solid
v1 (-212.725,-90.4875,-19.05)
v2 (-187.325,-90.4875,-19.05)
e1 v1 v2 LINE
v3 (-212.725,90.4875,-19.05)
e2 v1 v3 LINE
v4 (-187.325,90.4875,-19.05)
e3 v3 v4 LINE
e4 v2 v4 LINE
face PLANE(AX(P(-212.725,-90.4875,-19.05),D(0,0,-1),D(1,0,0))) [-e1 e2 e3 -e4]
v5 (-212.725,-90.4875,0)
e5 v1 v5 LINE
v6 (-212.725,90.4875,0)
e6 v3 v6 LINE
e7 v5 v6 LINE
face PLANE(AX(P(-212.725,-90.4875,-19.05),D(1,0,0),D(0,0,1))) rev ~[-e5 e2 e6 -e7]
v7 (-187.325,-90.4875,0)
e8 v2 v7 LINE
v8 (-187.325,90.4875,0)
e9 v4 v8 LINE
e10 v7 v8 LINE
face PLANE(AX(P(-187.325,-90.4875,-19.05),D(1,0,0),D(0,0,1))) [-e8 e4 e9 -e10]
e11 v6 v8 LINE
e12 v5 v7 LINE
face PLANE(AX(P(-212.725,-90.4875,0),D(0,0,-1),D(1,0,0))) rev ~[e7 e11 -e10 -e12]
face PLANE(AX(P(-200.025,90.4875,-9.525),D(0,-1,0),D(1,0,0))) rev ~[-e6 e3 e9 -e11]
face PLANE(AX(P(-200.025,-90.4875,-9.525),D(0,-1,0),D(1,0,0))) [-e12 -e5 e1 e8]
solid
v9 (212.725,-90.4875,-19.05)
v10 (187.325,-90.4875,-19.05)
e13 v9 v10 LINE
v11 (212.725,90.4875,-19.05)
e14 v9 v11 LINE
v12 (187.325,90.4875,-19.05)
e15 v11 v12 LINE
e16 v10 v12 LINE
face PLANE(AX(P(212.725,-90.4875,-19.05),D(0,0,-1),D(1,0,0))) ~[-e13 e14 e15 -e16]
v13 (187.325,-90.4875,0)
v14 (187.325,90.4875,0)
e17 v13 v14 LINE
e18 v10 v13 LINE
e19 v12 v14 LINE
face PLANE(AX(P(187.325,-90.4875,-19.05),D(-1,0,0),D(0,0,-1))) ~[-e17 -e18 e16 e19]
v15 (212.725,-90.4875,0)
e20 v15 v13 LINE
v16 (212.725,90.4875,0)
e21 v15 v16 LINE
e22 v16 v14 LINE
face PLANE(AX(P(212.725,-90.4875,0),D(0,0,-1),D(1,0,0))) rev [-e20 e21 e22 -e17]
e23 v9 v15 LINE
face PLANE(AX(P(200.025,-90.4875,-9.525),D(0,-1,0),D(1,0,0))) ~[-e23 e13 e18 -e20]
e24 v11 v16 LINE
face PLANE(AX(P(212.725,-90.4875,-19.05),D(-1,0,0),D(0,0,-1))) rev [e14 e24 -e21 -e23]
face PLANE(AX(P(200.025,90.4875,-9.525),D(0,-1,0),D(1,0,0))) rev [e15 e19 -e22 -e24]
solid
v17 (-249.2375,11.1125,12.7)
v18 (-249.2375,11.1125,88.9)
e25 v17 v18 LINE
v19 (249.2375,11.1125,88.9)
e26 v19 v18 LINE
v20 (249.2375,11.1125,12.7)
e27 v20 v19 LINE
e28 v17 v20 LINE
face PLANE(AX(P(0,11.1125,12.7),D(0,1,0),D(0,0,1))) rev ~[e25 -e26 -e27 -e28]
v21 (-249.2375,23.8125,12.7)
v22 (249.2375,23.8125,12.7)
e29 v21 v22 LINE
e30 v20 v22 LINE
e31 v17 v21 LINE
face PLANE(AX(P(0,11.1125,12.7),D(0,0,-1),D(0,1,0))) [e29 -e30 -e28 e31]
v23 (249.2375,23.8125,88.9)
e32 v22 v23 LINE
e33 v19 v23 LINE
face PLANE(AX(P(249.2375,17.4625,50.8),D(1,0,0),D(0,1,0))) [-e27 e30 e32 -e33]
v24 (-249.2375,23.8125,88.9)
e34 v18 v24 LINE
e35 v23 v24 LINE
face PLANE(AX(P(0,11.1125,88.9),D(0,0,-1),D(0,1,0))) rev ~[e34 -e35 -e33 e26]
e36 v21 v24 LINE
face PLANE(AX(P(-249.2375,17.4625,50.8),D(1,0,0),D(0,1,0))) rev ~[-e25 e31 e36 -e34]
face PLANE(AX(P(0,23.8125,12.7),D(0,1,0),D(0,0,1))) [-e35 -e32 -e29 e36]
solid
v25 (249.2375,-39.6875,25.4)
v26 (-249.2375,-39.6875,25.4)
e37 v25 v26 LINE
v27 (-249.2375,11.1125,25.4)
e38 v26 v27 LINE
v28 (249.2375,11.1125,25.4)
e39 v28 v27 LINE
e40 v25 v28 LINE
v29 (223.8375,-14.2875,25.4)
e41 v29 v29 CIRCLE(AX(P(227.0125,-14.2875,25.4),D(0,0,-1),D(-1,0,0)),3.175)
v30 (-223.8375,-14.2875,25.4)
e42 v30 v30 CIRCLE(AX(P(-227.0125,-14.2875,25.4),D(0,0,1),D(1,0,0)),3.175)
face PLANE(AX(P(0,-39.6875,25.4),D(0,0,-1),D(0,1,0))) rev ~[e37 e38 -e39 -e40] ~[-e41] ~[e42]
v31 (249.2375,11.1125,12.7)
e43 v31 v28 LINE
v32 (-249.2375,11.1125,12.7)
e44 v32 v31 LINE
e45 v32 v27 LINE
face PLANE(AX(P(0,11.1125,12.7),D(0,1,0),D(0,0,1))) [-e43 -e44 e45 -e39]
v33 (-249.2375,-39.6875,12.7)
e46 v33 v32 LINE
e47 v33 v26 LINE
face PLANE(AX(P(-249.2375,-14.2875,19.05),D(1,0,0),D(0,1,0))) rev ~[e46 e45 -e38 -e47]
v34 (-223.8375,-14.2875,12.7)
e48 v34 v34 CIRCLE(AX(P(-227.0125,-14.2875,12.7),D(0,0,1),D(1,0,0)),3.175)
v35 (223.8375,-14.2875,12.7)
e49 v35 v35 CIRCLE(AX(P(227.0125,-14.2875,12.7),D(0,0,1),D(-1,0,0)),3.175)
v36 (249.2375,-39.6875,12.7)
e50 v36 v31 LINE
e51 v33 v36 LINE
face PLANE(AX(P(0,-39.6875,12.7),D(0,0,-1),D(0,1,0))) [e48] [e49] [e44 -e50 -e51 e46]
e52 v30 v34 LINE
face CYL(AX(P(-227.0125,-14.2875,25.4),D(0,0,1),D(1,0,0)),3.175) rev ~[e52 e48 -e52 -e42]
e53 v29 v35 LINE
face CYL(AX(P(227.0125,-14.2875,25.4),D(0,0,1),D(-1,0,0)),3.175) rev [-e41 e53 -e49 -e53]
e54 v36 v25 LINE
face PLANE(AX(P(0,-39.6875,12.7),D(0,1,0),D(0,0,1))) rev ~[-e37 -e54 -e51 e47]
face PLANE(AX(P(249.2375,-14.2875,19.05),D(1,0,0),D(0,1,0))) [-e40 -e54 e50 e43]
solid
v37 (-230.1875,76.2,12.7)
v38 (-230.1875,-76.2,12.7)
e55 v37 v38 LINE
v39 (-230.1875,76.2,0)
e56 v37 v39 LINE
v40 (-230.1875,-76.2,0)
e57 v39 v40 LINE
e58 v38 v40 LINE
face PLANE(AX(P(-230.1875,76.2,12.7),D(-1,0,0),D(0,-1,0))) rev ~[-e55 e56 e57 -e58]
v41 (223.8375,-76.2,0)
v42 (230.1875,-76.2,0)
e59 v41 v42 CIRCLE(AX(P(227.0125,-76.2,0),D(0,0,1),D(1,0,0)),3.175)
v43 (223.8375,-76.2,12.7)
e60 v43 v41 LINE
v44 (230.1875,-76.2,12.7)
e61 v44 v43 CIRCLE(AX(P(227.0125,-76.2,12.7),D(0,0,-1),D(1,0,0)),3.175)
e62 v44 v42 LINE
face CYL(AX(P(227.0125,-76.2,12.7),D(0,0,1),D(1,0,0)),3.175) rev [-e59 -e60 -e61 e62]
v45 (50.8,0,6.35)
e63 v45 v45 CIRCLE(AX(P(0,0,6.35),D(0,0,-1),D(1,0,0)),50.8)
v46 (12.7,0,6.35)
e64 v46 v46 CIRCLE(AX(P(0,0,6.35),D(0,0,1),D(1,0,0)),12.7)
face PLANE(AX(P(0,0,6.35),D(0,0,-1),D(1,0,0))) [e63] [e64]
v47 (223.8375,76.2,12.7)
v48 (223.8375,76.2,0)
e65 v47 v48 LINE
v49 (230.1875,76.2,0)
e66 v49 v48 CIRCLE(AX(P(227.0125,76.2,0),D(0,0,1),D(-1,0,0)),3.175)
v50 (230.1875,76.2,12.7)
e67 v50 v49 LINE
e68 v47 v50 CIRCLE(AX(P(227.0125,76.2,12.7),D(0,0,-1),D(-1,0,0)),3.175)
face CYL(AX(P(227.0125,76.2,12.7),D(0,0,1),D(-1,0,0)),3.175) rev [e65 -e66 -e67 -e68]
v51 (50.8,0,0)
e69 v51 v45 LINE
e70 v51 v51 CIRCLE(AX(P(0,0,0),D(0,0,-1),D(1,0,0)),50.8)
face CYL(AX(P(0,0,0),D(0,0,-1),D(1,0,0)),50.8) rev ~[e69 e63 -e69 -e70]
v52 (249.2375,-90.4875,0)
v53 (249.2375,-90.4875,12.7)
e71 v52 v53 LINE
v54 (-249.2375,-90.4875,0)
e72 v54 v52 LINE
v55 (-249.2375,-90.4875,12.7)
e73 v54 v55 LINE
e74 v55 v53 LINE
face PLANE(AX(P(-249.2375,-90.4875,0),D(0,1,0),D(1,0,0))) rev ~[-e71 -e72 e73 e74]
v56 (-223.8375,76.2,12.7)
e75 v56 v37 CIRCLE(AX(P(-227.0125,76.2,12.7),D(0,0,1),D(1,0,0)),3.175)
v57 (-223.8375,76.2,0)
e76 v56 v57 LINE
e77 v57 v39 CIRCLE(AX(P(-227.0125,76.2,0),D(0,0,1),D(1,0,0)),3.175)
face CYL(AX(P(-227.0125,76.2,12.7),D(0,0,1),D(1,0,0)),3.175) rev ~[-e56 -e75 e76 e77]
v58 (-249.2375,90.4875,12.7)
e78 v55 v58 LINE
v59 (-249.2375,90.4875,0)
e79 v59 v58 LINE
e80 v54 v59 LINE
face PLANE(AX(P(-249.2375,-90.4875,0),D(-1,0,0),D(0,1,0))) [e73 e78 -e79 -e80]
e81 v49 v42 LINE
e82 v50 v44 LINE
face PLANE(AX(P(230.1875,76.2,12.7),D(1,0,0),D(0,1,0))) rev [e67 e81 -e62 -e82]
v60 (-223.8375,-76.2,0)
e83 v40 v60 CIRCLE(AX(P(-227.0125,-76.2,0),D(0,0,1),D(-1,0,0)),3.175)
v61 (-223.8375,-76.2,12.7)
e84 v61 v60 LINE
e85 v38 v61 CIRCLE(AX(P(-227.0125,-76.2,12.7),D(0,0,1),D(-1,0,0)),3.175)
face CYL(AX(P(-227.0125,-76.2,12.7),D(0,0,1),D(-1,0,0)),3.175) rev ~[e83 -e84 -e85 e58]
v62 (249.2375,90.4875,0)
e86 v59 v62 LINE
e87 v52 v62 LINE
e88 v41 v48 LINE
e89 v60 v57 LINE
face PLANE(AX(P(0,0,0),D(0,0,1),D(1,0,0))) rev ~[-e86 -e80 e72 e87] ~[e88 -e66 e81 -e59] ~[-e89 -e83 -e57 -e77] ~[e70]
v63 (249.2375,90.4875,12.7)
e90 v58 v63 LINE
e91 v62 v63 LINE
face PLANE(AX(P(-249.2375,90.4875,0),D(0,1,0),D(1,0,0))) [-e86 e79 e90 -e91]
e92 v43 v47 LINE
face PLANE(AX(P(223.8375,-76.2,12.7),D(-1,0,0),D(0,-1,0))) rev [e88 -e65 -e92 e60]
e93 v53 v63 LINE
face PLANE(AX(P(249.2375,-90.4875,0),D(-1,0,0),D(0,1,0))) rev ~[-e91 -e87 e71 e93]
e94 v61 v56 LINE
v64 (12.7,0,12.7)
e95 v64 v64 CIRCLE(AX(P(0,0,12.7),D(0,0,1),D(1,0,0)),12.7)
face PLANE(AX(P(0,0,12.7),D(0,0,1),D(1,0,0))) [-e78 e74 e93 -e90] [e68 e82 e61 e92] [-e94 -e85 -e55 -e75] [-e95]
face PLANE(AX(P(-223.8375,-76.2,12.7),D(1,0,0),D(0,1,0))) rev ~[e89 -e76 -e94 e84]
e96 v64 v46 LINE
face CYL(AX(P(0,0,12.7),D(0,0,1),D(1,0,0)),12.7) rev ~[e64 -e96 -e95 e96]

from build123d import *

# Parameters (mm, degrees)
F0_W      = 498.475
F0_H      = 180.975
F1_DEPTH  = 12.7
F2_W      = 25.4
F2_H      = 19.05
F3_DEPTH  = 180.975
F5_R      = 12.7
F6_DEPTH  = 25.4
F7_R      = 50.8
F8_DEPTH  = 6.35
F10_DEPTH = 25.4
F11_W     = 50.8
F11_H     = 12.7
F12_DEPTH = 249.2375
F13_R     = 3.175
F14_DEPTH = 25.4
F15_W     = 12.7
F15_H     = 76.2
F16_DEPTH = 249.2375


# Not quite as in the source:
# - a pattern or mirror of a feature is missing from the dataset's text; its kind, count and spacing are read off the source's solid


with BuildPart() as f1:
    # F0 (on Top) → F1 (new body)
    with BuildSketch(Plane.XY):
        Rectangle(F0_W, F0_H)
    extrude(amount=F1_DEPTH)

    # F5 (on face) → F6 (cut)
    with BuildSketch(Plane.XY.offset(12.7)):
        Circle(F5_R)
    extrude(amount=-F6_DEPTH, mode=Mode.SUBTRACT)

    # F7 (on face) → F8 (cut)
    with BuildSketch(Plane(origin=(0, 0, 0), x_dir=(1, 0, 0), z_dir=(0, 0, -1))):
        Circle(F7_R)
    extrude(amount=-F8_DEPTH, mode=Mode.SUBTRACT)

    # F9 (on face) → F10 (cut)
    with BuildSketch(Plane.XY.offset(12.7)):
        with BuildLine():
            Line((-230.1875, 76.2), (-230.1875, -76.2))
            ThreePointArc((-230.1875, -76.2), (-227.0125, -79.375), (-223.8375, -76.2))
            Line((-223.8375, -76.2), (-223.8375, 76.2))
            ThreePointArc((-223.8375, 76.2), (-227.0125, 79.375), (-230.1875, 76.2))
        make_face()
    f10 = extrude(amount=-F10_DEPTH, mode=Mode.SUBTRACT)

    # F10_copies: F10 across plane
    add(f10.mirror(Plane(origin=(0, 0, 0), x_dir=(0, 0, 1), z_dir=(1, 0, 0))), mode=Mode.SUBTRACT)


with BuildPart() as f3:
    # F2 (on face) → F3 (new body, through all)
    with BuildSketch(Plane.XZ.offset(90.4875)):
        with Locations((-200.025, -9.525)):
            Rectangle(F2_W, F2_H)
    extrude(amount=-F3_DEPTH)


with BuildPart() as f4_1:
    # F4: instance of F3
    add(f3.part.mirror(Plane.YZ))


with BuildPart() as f12:
    # F11 (on Right) → F12 (new body, symmetric)
    with BuildSketch(Plane.YZ):
        with Locations((-14.2875, 19.05)):
            Rectangle(F11_W, F11_H)
    extrude(amount=F12_DEPTH, both=True)

    # F13 (on face) → F14 (cut)
    with BuildSketch(Plane.XY.offset(25.4)):
        with Locations((-227.0125, -14.2875)):
            Circle(F13_R)
    f14 = extrude(amount=-F14_DEPTH, mode=Mode.SUBTRACT)

    # F14_copies: F14 across plane
    add(f14.mirror(Plane(origin=(0, 0, 0), x_dir=(0, 0, 1), z_dir=(1, 0, 0))), mode=Mode.SUBTRACT)


with BuildPart() as f16:
    # F15 (on Right) → F16 (new body, symmetric)
    with BuildSketch(Plane.YZ):
        with Locations((17.4625, 50.8)):
            Rectangle(F15_W, F15_H)
    extrude(amount=F16_DEPTH, both=True)


solid = Compound([f1.part, f3.part, f4_1.part, f12.part, f16.part])
